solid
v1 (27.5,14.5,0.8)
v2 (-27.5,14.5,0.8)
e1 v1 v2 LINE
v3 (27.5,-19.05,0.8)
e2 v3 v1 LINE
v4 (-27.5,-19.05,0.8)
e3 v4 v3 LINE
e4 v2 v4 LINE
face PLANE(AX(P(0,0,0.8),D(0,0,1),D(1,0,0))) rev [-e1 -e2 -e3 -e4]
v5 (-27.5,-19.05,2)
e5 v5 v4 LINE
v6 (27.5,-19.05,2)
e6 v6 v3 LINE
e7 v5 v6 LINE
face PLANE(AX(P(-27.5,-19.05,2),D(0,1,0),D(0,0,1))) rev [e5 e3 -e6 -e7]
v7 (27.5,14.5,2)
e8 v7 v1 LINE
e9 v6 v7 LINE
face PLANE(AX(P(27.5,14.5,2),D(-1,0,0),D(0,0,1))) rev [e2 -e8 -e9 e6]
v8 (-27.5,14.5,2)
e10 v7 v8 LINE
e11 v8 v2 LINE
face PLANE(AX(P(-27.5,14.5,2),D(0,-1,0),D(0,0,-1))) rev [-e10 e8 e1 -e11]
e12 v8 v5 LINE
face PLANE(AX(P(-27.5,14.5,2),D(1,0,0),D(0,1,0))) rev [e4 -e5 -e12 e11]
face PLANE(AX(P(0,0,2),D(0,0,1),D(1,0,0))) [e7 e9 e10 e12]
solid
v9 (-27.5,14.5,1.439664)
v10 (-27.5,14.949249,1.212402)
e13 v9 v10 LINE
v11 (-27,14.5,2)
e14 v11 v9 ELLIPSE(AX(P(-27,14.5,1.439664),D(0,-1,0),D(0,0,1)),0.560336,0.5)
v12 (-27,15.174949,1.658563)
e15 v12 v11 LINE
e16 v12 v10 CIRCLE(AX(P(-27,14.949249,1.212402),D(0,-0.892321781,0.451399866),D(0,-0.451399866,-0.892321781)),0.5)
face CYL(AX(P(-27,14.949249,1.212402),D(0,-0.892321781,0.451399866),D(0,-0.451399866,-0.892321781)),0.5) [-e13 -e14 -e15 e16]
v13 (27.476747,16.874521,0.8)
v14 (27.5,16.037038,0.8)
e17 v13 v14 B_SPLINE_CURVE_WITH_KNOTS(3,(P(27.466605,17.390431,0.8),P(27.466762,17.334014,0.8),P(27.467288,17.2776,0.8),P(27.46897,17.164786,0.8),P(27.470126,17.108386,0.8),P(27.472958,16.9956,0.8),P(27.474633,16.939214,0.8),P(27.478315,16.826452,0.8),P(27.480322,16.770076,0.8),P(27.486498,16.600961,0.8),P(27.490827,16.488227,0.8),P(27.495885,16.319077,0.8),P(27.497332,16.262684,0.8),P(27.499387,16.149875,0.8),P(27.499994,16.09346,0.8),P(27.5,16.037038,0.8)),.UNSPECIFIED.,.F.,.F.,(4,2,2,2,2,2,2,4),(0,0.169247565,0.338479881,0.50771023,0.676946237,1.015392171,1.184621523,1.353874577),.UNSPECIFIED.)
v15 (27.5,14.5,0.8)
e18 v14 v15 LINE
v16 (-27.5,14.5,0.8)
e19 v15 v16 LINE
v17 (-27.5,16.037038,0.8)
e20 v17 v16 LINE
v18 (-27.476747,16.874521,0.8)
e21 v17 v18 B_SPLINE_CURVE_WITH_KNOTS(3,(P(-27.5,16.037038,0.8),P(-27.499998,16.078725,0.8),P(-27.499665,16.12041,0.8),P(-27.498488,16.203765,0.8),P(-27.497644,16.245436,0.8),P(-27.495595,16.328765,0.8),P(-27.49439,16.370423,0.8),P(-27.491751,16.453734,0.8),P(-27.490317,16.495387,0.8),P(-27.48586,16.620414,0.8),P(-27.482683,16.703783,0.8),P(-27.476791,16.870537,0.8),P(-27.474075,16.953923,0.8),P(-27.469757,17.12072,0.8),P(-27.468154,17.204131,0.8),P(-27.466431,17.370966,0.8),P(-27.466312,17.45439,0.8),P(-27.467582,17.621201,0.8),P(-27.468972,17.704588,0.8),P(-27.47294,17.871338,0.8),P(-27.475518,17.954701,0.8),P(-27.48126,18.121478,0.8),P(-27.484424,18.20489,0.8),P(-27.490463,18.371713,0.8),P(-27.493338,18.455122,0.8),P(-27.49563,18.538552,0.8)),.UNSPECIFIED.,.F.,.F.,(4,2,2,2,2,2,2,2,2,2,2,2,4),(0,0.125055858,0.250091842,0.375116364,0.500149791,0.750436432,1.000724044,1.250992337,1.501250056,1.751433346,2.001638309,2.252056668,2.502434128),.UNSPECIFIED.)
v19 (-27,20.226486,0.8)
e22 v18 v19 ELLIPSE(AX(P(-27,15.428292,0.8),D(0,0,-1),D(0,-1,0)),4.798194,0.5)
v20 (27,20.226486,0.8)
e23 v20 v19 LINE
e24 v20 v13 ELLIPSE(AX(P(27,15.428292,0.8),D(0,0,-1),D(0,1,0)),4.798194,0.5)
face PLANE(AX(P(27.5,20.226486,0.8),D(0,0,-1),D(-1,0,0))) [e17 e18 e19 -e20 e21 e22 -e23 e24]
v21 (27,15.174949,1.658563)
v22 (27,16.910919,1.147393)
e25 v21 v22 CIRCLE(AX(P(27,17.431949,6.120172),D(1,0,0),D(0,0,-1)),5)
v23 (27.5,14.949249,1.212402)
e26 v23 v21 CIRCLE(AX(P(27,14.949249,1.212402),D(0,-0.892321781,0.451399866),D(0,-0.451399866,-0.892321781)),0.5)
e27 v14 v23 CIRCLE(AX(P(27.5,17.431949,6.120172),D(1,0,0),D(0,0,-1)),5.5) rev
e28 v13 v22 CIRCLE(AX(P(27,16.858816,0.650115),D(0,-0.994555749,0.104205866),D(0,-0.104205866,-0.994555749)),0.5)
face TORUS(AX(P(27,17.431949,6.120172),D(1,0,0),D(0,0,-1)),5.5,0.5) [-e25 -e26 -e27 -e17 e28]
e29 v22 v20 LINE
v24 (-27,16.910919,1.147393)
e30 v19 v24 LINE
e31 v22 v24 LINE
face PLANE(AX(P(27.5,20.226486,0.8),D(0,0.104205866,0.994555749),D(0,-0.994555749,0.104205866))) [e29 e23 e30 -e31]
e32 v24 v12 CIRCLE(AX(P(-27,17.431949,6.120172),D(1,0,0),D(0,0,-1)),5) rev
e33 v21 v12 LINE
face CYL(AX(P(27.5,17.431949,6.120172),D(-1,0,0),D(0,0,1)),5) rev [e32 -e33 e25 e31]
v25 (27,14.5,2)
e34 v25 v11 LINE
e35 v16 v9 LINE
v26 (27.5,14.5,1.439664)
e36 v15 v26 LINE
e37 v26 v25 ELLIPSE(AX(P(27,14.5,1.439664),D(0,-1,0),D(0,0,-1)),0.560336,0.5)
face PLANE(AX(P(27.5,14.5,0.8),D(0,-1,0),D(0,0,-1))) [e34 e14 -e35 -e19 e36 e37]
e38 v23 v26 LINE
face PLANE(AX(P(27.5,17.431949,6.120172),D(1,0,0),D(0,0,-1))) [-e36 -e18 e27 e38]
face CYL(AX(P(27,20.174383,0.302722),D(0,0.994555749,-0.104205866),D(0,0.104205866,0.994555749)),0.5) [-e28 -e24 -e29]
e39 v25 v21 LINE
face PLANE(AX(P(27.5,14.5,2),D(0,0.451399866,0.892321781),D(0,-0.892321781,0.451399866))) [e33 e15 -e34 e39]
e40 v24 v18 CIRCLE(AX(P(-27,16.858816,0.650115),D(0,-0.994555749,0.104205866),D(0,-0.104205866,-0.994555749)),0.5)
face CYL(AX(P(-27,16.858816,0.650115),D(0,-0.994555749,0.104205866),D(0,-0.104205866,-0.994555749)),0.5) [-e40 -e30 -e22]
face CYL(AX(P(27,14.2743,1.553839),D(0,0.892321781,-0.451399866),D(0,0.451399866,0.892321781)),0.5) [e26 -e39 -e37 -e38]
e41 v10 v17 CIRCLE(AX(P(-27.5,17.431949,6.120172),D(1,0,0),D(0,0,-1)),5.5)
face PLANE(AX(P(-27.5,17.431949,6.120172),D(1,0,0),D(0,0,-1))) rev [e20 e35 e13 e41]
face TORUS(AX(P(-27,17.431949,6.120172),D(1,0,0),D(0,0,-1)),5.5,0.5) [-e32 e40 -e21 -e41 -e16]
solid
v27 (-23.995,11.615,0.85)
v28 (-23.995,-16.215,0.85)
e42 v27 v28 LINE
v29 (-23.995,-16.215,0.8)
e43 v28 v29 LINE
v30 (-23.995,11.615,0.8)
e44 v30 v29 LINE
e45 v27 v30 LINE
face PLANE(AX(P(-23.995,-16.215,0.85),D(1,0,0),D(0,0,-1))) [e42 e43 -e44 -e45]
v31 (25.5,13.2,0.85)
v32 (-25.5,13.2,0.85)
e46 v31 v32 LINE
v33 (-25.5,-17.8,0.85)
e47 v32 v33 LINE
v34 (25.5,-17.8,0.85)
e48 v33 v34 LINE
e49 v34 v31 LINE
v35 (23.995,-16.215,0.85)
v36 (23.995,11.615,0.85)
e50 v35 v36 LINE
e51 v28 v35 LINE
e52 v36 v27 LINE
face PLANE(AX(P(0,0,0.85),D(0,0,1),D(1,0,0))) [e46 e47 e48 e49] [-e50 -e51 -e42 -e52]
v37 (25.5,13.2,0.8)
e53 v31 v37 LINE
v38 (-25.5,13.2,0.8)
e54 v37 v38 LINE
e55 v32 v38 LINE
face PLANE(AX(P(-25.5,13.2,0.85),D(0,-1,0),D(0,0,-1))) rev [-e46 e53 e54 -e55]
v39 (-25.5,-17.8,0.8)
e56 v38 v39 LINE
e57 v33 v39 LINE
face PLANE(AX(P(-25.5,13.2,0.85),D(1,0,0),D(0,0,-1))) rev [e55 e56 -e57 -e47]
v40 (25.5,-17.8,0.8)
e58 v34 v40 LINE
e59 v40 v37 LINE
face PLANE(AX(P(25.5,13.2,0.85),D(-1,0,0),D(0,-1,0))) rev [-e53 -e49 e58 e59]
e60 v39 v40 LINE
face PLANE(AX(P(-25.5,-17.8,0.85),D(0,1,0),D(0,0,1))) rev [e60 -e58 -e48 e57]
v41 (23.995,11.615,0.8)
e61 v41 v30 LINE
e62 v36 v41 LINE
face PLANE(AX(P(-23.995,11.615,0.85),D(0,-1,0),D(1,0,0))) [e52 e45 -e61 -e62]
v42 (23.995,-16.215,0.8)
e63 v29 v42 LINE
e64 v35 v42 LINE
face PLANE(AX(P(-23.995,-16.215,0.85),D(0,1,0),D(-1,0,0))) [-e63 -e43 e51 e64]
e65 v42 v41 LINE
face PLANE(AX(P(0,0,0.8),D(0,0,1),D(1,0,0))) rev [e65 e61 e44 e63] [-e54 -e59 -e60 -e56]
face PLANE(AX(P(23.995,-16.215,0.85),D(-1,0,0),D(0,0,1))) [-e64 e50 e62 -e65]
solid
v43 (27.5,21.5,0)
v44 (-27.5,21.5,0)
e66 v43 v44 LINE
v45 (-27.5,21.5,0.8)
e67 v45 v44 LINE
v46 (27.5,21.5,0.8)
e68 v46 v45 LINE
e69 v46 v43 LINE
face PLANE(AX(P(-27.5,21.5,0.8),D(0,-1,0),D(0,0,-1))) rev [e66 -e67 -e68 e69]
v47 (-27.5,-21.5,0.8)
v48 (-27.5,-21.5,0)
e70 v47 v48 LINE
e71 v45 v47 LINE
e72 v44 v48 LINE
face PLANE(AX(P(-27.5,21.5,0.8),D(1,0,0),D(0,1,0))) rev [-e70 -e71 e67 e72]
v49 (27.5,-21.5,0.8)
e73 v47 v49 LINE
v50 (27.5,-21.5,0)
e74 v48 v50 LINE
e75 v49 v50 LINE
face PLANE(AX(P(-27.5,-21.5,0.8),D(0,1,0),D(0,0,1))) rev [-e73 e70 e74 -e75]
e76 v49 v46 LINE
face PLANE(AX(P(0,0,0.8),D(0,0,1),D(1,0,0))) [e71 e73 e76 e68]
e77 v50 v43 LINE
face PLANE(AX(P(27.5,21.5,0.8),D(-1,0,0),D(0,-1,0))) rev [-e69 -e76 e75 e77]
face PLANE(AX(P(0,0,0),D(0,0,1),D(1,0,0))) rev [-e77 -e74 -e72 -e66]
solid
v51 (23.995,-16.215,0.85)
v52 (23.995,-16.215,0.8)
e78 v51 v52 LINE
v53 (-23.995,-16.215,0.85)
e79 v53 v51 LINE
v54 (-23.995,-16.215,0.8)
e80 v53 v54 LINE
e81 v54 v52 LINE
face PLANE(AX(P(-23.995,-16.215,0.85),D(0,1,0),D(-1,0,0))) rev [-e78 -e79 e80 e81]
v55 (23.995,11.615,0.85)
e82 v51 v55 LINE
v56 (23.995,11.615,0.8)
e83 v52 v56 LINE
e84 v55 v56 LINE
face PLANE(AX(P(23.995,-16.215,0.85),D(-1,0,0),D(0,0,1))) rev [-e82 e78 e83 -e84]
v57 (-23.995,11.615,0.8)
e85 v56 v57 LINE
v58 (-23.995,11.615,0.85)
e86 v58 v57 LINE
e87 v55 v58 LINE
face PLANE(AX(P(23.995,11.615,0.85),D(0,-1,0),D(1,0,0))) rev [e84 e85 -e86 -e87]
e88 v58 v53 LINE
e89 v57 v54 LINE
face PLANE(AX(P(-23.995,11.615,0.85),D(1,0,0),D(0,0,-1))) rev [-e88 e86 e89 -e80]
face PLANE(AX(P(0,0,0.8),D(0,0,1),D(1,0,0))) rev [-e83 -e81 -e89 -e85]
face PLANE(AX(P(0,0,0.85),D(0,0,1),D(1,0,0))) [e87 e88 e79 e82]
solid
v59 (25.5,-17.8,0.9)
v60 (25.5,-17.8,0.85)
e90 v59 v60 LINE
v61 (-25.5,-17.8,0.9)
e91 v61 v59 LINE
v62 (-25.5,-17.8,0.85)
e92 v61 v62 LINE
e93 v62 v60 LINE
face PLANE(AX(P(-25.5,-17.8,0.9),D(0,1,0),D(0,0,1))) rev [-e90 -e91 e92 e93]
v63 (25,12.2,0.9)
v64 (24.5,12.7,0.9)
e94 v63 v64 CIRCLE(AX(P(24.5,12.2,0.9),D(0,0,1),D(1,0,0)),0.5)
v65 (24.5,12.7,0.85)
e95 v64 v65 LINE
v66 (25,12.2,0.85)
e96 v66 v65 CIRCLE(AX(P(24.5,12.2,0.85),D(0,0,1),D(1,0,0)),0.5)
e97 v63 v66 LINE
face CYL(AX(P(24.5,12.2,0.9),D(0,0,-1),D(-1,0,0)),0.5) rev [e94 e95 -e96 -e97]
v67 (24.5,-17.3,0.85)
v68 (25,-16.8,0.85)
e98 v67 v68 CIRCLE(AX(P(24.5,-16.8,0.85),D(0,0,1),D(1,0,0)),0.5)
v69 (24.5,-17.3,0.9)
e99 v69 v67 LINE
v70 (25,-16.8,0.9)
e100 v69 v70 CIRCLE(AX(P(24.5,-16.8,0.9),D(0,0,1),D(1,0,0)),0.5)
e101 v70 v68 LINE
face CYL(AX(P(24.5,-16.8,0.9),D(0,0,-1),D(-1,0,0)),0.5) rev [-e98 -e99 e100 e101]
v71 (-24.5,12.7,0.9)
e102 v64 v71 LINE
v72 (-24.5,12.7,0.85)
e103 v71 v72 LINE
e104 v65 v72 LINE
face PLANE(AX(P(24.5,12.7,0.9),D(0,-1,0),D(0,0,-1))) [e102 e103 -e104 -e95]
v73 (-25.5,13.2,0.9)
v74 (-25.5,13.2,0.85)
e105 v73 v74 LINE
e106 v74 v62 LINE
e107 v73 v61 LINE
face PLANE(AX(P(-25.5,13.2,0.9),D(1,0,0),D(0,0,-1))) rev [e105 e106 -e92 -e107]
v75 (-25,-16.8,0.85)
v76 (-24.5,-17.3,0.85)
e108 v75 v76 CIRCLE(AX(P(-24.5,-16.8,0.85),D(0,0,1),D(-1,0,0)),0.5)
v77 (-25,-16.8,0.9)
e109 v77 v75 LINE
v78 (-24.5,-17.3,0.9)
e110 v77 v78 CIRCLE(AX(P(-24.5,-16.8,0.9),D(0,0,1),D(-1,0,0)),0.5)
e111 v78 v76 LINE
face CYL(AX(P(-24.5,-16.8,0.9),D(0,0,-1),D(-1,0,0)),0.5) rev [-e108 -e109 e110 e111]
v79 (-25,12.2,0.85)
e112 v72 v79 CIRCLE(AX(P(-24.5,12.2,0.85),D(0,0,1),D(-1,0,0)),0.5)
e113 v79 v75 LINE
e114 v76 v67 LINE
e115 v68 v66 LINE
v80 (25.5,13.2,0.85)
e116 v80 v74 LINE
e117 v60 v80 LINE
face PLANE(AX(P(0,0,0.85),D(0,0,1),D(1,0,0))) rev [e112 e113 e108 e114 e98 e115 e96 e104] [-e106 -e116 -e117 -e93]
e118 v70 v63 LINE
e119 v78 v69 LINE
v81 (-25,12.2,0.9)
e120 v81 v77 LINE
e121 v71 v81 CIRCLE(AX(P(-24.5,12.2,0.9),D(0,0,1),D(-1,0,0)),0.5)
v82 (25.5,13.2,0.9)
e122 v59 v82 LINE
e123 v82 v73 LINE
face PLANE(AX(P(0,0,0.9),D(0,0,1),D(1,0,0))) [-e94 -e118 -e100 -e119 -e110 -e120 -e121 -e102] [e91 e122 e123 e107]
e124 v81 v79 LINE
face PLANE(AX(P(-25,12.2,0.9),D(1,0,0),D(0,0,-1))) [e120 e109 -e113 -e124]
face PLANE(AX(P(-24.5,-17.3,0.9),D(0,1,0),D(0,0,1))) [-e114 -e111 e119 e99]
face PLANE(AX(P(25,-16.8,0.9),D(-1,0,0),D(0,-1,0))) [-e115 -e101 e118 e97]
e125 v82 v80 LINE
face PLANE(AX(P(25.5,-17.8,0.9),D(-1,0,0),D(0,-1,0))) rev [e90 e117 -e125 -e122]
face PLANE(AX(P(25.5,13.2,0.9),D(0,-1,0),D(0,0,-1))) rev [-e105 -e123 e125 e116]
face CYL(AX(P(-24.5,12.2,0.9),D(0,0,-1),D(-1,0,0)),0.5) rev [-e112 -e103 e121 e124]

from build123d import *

# Parameters (mm, degrees)
SKETCH1_W           = 55
SKETCH1_H           = 43
GLASSBASE_DEPTH     = 0.8
SKETCH3_W           = 51
SKETCH3_H           = 31
SKETCH3_W_2         = 47.99
SKETCH3_H_2         = 27.83
BOSS_EXTRUDE3_DEPTH = 0.05
SKETCH4_W           = 47.99
SKETCH4_H           = 27.83
BOSS_EXTRUDE4_DEPTH = 0.05
SKETCH5_W           = 51
SKETCH5_H           = 31
BOSS_EXTRUDE5_DEPTH = 0.05
SKETCH6_W           = 55
SKETCH6_H           = 33.55
BOSS_EXTRUDE6_DEPTH = 1.2
BOSS_EXTRUDE7_DEPTH = 55
FILLET1_R           = 0.5
FILLET2_R           = 0.5


with BuildPart() as part:
    # Sketch1 → GlassBase (new body)
    with BuildSketch(Plane.XY):
        Rectangle(SKETCH1_W, SKETCH1_H)
    extrude(amount=GLASSBASE_DEPTH)


with BuildPart() as body_2:
    # Sketch3 → Boss-Extrude3 (new body)
    with BuildSketch(Plane.XY.offset(0.8)):
        with Locations((0, -2.3)):
            Rectangle(SKETCH3_W, SKETCH3_H)
        with Locations((0, -2.3)):
            Rectangle(SKETCH3_W_2, SKETCH3_H_2, mode=Mode.SUBTRACT)
    extrude(amount=BOSS_EXTRUDE3_DEPTH)


with BuildPart() as body_3:
    # Sketch4 → Boss-Extrude4 (new body)
    with BuildSketch(Plane.XY.offset(0.8)):
        with Locations((0, -2.3)):
            Rectangle(SKETCH4_W, SKETCH4_H)
    extrude(amount=BOSS_EXTRUDE4_DEPTH)


with BuildPart() as body_4:
    # Sketch5 → Boss-Extrude5 (new body)
    with BuildSketch(Plane.XY.offset(0.85)):
        with Locations((0, -2.3)):
            Rectangle(SKETCH5_W, SKETCH5_H)
        with BuildLine():
            Line((-24.5, -17.3), (24.5, -17.3))
            ThreePointArc((24.5, -17.3), (24.853553391, -17.153553391), (25, -16.8))
            Line((25, -16.8), (25, 12.2))
            ThreePointArc((25, 12.2), (24.853553391, 12.553553391), (24.5, 12.7))
            Line((24.5, 12.7), (-24.5, 12.7))
            ThreePointArc((-24.5, 12.7), (-24.853553391, 12.553553391), (-25, 12.2))
            Line((-25, 12.2), (-25, -16.8))
            ThreePointArc((-25, -16.8), (-24.853553391, -17.153553391), (-24.5, -17.3))
        make_face(mode=Mode.SUBTRACT)
    extrude(amount=BOSS_EXTRUDE5_DEPTH)


with BuildPart() as body_5:
    # Sketch6 → Boss-Extrude6 (new body)
    with BuildSketch(Plane.XY.offset(0.8)):
        with Locations((0, -2.275)):
            Rectangle(SKETCH6_W, SKETCH6_H)
    extrude(amount=BOSS_EXTRUDE6_DEPTH)


with BuildPart() as body_6:
    # Sketch8 → Boss-Extrude7 (new body)
    with BuildSketch(Plane(origin=(-27.5, 14.5, 0.8), x_dir=(0, 0, 1), z_dir=(-1, 0, 0))):
        with BuildLine():
            Line((1.2, 0), (0.85856266, 0.674949192))
            ThreePointArc((0.85856266, 0.674949192), (0.523785891, 1.519615538), (0.347392821, 2.410919194))
            Line((0.347392821, 2.410919194), (0, 5.726486174))
            Line((0, 5.726486174), (0, 0))
            Line((0, 0), (1.2, 0))
        make_face()
    extrude(amount=-BOSS_EXTRUDE7_DEPTH)

    # Fillet1
    # the kernel refuses this fillet: 0.5 mm, written as the material it takes off along each edge
    with BuildSketch(Plane(origin=(-27.5, 16.910919194, 1.147392821), x_dir=(1, 0, 0), z_dir=(0, 0.994555748839717, -0.10420586571719334))) as fillet1_piece_1:
        with BuildLine():
            CenterArc((FILLET1_R, FILLET1_R), FILLET1_R, 180, 90)
            Line((0, FILLET1_R), (0, 0))
            Line((0, 0), (FILLET1_R, 0))
        make_face()
    extrude(amount=4.58371657, mode=Mode.SUBTRACT)
    with BuildSketch(Plane(origin=(-27.5, 17.431948523, 6.120171565), x_dir=(0, -0.45139986612381766, -0.8923217810091826), z_dir=(0, -0.8923217810091826, 0.45139986612381766))) as fillet1_piece_2:
        with BuildLine():
            CenterArc((5 + FILLET1_R, FILLET1_R), FILLET1_R, 180, 90)
            Line((5 + FILLET1_R, 0), (5, 0))
            Line((5, 0), (5, FILLET1_R))
        make_face()
    revolve(axis=Axis((-27.5, 17.431948523, 6.120171565), (1, 0, 0)), revolution_arc=20.852118409, mode=Mode.SUBTRACT)
    with BuildSketch(Plane(origin=(-27.5, 13.384597774, 2.564249833), x_dir=(1, 0, 0), z_dir=(0, 0.8923217810091835, -0.4513998661238159))) as fillet1_piece_3:
        with BuildLine():
            CenterArc((FILLET1_R, FILLET1_R), FILLET1_R, 180, 90)
            Line((0, FILLET1_R), (0, 0))
            Line((0, 0), (FILLET1_R, 0))
        make_face()
    extrude(amount=2.006396635, mode=Mode.SUBTRACT)

    # Fillet2
    # the kernel refuses this fillet: 0.5 mm, written as the material it takes off along each edge
    with BuildSketch(Plane(origin=(27.5, 17.431948523, 6.120171565), x_dir=(0, -0.45139986612381766, -0.8923217810091826), z_dir=(0, -0.8923217810091826, 0.45139986612381766))) as fillet2_piece_1:
        with BuildLine():
            CenterArc((5 + FILLET2_R, -FILLET2_R), FILLET2_R, 90, 90)
            Line((5 + FILLET2_R, 0), (5, 0))
            Line((5, 0), (5, -FILLET2_R))
        make_face()
    revolve(axis=Axis((27.5, 17.431948523, 6.120171565), (1, 0, 0)), revolution_arc=20.852118409, mode=Mode.SUBTRACT)
    with BuildSketch(Plane(origin=(27.5, 16.910919194, 1.147392821), x_dir=(0, -0.10420586571719336, -0.9945557488397171), z_dir=(0, 0.994555748839717, -0.10420586571719334))) as fillet2_piece_2:
        with BuildLine():
            CenterArc((FILLET2_R, FILLET2_R), FILLET2_R, 180, 90)
            Line((0, FILLET2_R), (0, 0))
            Line((0, 0), (FILLET2_R, 0))
        make_face()
    extrude(amount=4.58371657, mode=Mode.SUBTRACT)
    with BuildSketch(Plane(origin=(27.5, 13.384597774, 2.564249833), x_dir=(-1, 0, 0), z_dir=(0, 0.8923217810091835, -0.4513998661238159))) as fillet2_piece_3:
        with BuildLine():
            CenterArc((FILLET2_R, -FILLET2_R), FILLET2_R, 90, 90)
            Line((0, -FILLET2_R), (0, 0))
            Line((0, 0), (FILLET2_R, 0))
        make_face()
    extrude(amount=2.006396635, mode=Mode.SUBTRACT)


solid = Compound([part.part, body_2.part, body_3.part, body_4.part, body_5.part, body_6.part])
